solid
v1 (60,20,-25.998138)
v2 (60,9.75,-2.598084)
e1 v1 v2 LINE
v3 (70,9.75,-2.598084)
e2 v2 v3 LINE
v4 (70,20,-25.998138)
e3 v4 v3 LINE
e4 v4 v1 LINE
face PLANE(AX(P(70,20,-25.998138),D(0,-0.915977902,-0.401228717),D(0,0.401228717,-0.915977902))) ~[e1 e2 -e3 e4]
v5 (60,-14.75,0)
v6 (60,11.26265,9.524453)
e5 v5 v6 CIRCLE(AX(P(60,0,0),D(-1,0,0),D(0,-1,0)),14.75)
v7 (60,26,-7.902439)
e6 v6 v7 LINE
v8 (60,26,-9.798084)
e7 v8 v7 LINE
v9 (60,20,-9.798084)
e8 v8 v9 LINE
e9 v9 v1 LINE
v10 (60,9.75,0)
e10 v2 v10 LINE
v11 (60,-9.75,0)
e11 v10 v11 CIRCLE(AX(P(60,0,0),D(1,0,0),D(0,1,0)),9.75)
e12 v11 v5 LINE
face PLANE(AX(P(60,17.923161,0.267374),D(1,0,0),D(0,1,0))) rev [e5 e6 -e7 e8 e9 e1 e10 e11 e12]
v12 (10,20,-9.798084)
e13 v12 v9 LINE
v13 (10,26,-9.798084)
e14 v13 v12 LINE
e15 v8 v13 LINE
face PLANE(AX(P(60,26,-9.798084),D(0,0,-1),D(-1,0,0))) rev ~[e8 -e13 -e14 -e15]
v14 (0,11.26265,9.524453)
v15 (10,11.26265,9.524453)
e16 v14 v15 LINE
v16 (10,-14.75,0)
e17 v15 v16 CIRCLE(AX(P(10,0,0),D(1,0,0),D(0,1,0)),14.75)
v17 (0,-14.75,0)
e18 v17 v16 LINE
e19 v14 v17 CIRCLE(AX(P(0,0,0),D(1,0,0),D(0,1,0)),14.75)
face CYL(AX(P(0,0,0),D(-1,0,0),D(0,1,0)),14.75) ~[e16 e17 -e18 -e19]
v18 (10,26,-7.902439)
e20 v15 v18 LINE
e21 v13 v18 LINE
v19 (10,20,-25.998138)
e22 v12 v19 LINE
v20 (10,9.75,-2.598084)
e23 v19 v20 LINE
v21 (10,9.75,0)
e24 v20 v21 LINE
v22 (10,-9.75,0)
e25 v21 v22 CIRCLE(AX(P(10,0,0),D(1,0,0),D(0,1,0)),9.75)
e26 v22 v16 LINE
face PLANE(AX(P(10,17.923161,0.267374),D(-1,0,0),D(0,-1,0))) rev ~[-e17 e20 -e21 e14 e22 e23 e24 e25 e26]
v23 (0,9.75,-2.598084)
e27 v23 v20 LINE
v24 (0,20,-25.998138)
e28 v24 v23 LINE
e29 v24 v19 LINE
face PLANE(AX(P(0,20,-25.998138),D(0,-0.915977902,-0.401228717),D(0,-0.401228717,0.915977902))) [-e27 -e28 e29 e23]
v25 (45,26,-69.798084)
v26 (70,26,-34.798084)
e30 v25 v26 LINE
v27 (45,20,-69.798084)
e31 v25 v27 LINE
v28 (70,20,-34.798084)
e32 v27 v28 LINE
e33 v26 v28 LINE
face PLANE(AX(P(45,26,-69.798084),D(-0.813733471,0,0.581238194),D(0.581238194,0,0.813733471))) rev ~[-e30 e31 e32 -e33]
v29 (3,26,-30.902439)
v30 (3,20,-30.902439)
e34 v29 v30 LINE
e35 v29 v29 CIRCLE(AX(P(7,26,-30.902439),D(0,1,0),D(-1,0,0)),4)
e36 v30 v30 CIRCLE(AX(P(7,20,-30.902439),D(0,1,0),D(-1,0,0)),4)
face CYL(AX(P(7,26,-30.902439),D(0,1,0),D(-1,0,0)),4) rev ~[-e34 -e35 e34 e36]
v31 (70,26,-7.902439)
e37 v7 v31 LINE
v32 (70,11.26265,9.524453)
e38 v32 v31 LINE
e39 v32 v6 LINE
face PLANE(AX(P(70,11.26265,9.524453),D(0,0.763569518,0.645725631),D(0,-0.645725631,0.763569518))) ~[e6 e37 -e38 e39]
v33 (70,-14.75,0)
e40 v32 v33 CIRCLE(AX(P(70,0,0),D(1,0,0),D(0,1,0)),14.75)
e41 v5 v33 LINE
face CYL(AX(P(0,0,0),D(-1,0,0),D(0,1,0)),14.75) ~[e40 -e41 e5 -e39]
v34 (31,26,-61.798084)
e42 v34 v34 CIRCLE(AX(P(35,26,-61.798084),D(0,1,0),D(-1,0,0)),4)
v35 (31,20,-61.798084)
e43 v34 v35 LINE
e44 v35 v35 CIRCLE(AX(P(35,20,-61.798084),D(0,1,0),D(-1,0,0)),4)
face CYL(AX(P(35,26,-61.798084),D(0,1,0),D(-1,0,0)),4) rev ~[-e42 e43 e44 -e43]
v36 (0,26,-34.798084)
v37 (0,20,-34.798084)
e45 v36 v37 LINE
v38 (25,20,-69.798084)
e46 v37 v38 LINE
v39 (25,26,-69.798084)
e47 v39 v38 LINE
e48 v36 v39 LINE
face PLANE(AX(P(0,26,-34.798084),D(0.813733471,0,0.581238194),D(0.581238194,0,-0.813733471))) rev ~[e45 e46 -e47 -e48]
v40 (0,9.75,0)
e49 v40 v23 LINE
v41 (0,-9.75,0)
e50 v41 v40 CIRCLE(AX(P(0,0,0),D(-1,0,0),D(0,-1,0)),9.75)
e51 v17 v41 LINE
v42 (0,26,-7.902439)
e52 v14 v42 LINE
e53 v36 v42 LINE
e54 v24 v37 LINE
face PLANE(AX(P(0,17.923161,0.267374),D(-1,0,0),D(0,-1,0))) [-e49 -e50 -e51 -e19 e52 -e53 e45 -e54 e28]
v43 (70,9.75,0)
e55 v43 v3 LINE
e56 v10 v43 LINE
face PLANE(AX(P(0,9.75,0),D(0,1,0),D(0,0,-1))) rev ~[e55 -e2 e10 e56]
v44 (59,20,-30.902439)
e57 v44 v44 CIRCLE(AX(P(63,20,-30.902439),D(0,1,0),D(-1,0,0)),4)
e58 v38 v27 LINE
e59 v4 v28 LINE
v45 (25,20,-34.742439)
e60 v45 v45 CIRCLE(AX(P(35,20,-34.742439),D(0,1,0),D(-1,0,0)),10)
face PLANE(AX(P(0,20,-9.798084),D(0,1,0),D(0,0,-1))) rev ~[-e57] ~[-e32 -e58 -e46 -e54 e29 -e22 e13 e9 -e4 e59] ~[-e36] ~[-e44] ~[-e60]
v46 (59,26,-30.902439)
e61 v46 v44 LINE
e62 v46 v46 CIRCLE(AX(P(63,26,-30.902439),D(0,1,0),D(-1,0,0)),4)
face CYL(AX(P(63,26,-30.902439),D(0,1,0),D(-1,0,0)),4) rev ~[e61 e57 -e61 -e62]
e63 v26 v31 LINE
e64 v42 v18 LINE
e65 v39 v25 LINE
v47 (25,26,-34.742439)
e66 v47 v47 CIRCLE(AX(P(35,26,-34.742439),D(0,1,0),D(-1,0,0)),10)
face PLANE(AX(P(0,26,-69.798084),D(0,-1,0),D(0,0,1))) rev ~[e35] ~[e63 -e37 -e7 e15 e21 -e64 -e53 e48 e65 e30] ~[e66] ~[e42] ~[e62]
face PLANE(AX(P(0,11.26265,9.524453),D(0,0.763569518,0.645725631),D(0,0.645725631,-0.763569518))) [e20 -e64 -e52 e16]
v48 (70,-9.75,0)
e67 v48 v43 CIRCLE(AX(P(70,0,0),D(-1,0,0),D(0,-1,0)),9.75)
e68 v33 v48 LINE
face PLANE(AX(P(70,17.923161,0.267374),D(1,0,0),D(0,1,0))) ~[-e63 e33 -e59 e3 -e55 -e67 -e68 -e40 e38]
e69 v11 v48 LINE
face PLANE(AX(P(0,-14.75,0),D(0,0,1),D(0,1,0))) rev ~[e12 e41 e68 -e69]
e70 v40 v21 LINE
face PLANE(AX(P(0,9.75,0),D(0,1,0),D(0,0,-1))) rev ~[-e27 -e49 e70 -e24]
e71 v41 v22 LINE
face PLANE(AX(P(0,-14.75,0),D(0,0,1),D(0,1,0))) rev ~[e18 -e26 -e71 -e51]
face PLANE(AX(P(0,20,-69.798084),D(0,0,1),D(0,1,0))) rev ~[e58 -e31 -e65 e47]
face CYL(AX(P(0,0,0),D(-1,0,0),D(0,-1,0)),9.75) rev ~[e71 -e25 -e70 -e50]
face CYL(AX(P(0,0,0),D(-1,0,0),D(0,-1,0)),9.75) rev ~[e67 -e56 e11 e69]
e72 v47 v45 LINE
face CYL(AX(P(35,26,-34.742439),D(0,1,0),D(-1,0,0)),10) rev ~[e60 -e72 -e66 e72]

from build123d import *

# Parameters (mm, degrees)
F1_DEPTH  = 70
F4_W      = 50
F4_H      = 24.5480843189
F5_DEPTH  = 25
F7_DEPTH  = 40.7510000745
F8_R      = 10
F9_DEPTH  = 40.7510000745
F10_R     = 6.38
F11_DEPTH = 40.7510000745
F6_R      = 4
F12_DEPTH = 40.7510000745
F15_DEPTH = 10
F16_R     = 4
F17_DEPTH = 40.7510000745
F19_DEPTH = 10


# Not quite as in the source:
# - a pattern or mirror of a feature is missing from the dataset's text; its kind, count and spacing are read off the source's solid


with BuildPart() as f1:
    # F0 (on Right) → F1 (new body)
    with BuildSketch(Plane.YZ):
        with BuildLine():
            ThreePointArc((-9.75, 0), (0, 9.75), (9.75, 0))
            Line((9.75, 0), (9.75, -2.5980842444))
            Line((9.75, -2.5980842444), (20, -9.7980842444))
            Line((20, -9.7980842444), (20, -69.7980842444))
            Line((20, -69.7980842444), (26, -69.7980842444))
            Line((26, -69.7980842444), (26, -7.9024389721))
            Line((26, -7.9024389721), (14.7500000745, 0))
            ThreePointArc((14.7500000745, 0), (0, 14.7500000745), (-14.7500000745, 0))
            Line((-14.7500000745, 0), (-9.75, 0))
        make_face()
    extrude(amount=F1_DEPTH)

    # F4 (on face) → F5 (cut)
    with BuildSketch(Plane(origin=(0, 26, 0), x_dir=(-1, 0, 0), z_dir=(0, 1, 0))):
        Polygon((-45, -69.7980842444), (-70, -34.7980842444), (-90, -34.7980842444), (-90, -94.7980842444), (20, -94.7980842444), (20, -34.7980842444), (0, -34.7980842444), (-25, -69.7980842444), align=None)
        with Locations((-35, 2.475957915)):
            Rectangle(F4_W, F4_H)
    extrude(amount=-F5_DEPTH, mode=Mode.SUBTRACT)

    # F4 (on face) → F7 (cut, through all)
    with BuildSketch(Plane(origin=(0, 26, 0), x_dir=(-1, 0, 0), z_dir=(0, 1, 0))):
        Polygon((-45, -69.7980842444), (-70, -34.7980842444), (-90, -34.7980842444), (-90, -94.7980842444), (20, -94.7980842444), (20, -34.7980842444), (0, -34.7980842444), (-25, -69.7980842444), align=None)
        with Locations((-35, 2.475957915)):
            Rectangle(F4_W, F4_H)
    extrude(amount=-F7_DEPTH, mode=Mode.SUBTRACT)

    # F8 (on face) → F9 (cut, through all)
    with BuildSketch(Plane(origin=(0, 26, 0), x_dir=(-1, 0, 0), z_dir=(0, 1, 0))):
        with Locations((-35, -34.7424389721)):
            Circle(F8_R)
    extrude(amount=-F9_DEPTH, mode=Mode.SUBTRACT)

    # F10 (on face) → F11 (cut, through all)
    with BuildSketch(Plane(origin=(0, 26, 0), x_dir=(-1, 0, 0), z_dir=(0, 1, 0))):
        with Locations((-35, -34.7424389721)):
            Circle(F10_R)
    extrude(amount=-F11_DEPTH, mode=Mode.SUBTRACT)

    # F6 (on face) → F12 (cut, through all)
    with BuildSketch(Plane(origin=(0, 26, 0), x_dir=(-1, 0, 0), z_dir=(0, 1, 0))):
        with Locations((-63, -30.9024389721)):
            Circle(F6_R)
        with Locations((-7, -30.9024389721)):
            Circle(F6_R)
    extrude(amount=-F12_DEPTH, mode=Mode.SUBTRACT)

    # F14 (on face) → F15 (join)
    with BuildSketch(Plane(origin=(0, 0, 0), x_dir=(0, -1, 0), z_dir=(-1, 0, 0))):
        Polygon((-20, -9.7980842444), (-20, -25.9981378913), (-9.75, -2.5980842444), align=None)
    f15 = extrude(amount=-F15_DEPTH)

    # F15_copies: F15 across plane
    add(f15.mirror(Plane(origin=(35, 0, 0), x_dir=(0, 0, 1), z_dir=(1, 0, 0))))

    # F16 (on face) → F17 (cut, through all)
    with BuildSketch(Plane(origin=(0, 26, 0), x_dir=(-1, 0, 0), z_dir=(0, 1, 0))):
        with Locations((-35, -61.7980842444)):
            Circle(F16_R)
    extrude(amount=-F17_DEPTH, mode=Mode.SUBTRACT)

    # F18 (on face) → F19 (join)
    with BuildSketch(Plane(origin=(0, 0, 0), x_dir=(0, -1, 0), z_dir=(-1, 0, 0))):
        Polygon((-11.2626504483, 9.5244531117), (-26, -7.9024389721), (-14.7500000745, 0), align=None)
    f19 = extrude(amount=-F19_DEPTH)

    # F19_copies: F19 across plane
    add(f19.mirror(Plane(origin=(35, 0, 0), x_dir=(0, 0, 1), z_dir=(1, 0, 0))))


solid = f1.part
